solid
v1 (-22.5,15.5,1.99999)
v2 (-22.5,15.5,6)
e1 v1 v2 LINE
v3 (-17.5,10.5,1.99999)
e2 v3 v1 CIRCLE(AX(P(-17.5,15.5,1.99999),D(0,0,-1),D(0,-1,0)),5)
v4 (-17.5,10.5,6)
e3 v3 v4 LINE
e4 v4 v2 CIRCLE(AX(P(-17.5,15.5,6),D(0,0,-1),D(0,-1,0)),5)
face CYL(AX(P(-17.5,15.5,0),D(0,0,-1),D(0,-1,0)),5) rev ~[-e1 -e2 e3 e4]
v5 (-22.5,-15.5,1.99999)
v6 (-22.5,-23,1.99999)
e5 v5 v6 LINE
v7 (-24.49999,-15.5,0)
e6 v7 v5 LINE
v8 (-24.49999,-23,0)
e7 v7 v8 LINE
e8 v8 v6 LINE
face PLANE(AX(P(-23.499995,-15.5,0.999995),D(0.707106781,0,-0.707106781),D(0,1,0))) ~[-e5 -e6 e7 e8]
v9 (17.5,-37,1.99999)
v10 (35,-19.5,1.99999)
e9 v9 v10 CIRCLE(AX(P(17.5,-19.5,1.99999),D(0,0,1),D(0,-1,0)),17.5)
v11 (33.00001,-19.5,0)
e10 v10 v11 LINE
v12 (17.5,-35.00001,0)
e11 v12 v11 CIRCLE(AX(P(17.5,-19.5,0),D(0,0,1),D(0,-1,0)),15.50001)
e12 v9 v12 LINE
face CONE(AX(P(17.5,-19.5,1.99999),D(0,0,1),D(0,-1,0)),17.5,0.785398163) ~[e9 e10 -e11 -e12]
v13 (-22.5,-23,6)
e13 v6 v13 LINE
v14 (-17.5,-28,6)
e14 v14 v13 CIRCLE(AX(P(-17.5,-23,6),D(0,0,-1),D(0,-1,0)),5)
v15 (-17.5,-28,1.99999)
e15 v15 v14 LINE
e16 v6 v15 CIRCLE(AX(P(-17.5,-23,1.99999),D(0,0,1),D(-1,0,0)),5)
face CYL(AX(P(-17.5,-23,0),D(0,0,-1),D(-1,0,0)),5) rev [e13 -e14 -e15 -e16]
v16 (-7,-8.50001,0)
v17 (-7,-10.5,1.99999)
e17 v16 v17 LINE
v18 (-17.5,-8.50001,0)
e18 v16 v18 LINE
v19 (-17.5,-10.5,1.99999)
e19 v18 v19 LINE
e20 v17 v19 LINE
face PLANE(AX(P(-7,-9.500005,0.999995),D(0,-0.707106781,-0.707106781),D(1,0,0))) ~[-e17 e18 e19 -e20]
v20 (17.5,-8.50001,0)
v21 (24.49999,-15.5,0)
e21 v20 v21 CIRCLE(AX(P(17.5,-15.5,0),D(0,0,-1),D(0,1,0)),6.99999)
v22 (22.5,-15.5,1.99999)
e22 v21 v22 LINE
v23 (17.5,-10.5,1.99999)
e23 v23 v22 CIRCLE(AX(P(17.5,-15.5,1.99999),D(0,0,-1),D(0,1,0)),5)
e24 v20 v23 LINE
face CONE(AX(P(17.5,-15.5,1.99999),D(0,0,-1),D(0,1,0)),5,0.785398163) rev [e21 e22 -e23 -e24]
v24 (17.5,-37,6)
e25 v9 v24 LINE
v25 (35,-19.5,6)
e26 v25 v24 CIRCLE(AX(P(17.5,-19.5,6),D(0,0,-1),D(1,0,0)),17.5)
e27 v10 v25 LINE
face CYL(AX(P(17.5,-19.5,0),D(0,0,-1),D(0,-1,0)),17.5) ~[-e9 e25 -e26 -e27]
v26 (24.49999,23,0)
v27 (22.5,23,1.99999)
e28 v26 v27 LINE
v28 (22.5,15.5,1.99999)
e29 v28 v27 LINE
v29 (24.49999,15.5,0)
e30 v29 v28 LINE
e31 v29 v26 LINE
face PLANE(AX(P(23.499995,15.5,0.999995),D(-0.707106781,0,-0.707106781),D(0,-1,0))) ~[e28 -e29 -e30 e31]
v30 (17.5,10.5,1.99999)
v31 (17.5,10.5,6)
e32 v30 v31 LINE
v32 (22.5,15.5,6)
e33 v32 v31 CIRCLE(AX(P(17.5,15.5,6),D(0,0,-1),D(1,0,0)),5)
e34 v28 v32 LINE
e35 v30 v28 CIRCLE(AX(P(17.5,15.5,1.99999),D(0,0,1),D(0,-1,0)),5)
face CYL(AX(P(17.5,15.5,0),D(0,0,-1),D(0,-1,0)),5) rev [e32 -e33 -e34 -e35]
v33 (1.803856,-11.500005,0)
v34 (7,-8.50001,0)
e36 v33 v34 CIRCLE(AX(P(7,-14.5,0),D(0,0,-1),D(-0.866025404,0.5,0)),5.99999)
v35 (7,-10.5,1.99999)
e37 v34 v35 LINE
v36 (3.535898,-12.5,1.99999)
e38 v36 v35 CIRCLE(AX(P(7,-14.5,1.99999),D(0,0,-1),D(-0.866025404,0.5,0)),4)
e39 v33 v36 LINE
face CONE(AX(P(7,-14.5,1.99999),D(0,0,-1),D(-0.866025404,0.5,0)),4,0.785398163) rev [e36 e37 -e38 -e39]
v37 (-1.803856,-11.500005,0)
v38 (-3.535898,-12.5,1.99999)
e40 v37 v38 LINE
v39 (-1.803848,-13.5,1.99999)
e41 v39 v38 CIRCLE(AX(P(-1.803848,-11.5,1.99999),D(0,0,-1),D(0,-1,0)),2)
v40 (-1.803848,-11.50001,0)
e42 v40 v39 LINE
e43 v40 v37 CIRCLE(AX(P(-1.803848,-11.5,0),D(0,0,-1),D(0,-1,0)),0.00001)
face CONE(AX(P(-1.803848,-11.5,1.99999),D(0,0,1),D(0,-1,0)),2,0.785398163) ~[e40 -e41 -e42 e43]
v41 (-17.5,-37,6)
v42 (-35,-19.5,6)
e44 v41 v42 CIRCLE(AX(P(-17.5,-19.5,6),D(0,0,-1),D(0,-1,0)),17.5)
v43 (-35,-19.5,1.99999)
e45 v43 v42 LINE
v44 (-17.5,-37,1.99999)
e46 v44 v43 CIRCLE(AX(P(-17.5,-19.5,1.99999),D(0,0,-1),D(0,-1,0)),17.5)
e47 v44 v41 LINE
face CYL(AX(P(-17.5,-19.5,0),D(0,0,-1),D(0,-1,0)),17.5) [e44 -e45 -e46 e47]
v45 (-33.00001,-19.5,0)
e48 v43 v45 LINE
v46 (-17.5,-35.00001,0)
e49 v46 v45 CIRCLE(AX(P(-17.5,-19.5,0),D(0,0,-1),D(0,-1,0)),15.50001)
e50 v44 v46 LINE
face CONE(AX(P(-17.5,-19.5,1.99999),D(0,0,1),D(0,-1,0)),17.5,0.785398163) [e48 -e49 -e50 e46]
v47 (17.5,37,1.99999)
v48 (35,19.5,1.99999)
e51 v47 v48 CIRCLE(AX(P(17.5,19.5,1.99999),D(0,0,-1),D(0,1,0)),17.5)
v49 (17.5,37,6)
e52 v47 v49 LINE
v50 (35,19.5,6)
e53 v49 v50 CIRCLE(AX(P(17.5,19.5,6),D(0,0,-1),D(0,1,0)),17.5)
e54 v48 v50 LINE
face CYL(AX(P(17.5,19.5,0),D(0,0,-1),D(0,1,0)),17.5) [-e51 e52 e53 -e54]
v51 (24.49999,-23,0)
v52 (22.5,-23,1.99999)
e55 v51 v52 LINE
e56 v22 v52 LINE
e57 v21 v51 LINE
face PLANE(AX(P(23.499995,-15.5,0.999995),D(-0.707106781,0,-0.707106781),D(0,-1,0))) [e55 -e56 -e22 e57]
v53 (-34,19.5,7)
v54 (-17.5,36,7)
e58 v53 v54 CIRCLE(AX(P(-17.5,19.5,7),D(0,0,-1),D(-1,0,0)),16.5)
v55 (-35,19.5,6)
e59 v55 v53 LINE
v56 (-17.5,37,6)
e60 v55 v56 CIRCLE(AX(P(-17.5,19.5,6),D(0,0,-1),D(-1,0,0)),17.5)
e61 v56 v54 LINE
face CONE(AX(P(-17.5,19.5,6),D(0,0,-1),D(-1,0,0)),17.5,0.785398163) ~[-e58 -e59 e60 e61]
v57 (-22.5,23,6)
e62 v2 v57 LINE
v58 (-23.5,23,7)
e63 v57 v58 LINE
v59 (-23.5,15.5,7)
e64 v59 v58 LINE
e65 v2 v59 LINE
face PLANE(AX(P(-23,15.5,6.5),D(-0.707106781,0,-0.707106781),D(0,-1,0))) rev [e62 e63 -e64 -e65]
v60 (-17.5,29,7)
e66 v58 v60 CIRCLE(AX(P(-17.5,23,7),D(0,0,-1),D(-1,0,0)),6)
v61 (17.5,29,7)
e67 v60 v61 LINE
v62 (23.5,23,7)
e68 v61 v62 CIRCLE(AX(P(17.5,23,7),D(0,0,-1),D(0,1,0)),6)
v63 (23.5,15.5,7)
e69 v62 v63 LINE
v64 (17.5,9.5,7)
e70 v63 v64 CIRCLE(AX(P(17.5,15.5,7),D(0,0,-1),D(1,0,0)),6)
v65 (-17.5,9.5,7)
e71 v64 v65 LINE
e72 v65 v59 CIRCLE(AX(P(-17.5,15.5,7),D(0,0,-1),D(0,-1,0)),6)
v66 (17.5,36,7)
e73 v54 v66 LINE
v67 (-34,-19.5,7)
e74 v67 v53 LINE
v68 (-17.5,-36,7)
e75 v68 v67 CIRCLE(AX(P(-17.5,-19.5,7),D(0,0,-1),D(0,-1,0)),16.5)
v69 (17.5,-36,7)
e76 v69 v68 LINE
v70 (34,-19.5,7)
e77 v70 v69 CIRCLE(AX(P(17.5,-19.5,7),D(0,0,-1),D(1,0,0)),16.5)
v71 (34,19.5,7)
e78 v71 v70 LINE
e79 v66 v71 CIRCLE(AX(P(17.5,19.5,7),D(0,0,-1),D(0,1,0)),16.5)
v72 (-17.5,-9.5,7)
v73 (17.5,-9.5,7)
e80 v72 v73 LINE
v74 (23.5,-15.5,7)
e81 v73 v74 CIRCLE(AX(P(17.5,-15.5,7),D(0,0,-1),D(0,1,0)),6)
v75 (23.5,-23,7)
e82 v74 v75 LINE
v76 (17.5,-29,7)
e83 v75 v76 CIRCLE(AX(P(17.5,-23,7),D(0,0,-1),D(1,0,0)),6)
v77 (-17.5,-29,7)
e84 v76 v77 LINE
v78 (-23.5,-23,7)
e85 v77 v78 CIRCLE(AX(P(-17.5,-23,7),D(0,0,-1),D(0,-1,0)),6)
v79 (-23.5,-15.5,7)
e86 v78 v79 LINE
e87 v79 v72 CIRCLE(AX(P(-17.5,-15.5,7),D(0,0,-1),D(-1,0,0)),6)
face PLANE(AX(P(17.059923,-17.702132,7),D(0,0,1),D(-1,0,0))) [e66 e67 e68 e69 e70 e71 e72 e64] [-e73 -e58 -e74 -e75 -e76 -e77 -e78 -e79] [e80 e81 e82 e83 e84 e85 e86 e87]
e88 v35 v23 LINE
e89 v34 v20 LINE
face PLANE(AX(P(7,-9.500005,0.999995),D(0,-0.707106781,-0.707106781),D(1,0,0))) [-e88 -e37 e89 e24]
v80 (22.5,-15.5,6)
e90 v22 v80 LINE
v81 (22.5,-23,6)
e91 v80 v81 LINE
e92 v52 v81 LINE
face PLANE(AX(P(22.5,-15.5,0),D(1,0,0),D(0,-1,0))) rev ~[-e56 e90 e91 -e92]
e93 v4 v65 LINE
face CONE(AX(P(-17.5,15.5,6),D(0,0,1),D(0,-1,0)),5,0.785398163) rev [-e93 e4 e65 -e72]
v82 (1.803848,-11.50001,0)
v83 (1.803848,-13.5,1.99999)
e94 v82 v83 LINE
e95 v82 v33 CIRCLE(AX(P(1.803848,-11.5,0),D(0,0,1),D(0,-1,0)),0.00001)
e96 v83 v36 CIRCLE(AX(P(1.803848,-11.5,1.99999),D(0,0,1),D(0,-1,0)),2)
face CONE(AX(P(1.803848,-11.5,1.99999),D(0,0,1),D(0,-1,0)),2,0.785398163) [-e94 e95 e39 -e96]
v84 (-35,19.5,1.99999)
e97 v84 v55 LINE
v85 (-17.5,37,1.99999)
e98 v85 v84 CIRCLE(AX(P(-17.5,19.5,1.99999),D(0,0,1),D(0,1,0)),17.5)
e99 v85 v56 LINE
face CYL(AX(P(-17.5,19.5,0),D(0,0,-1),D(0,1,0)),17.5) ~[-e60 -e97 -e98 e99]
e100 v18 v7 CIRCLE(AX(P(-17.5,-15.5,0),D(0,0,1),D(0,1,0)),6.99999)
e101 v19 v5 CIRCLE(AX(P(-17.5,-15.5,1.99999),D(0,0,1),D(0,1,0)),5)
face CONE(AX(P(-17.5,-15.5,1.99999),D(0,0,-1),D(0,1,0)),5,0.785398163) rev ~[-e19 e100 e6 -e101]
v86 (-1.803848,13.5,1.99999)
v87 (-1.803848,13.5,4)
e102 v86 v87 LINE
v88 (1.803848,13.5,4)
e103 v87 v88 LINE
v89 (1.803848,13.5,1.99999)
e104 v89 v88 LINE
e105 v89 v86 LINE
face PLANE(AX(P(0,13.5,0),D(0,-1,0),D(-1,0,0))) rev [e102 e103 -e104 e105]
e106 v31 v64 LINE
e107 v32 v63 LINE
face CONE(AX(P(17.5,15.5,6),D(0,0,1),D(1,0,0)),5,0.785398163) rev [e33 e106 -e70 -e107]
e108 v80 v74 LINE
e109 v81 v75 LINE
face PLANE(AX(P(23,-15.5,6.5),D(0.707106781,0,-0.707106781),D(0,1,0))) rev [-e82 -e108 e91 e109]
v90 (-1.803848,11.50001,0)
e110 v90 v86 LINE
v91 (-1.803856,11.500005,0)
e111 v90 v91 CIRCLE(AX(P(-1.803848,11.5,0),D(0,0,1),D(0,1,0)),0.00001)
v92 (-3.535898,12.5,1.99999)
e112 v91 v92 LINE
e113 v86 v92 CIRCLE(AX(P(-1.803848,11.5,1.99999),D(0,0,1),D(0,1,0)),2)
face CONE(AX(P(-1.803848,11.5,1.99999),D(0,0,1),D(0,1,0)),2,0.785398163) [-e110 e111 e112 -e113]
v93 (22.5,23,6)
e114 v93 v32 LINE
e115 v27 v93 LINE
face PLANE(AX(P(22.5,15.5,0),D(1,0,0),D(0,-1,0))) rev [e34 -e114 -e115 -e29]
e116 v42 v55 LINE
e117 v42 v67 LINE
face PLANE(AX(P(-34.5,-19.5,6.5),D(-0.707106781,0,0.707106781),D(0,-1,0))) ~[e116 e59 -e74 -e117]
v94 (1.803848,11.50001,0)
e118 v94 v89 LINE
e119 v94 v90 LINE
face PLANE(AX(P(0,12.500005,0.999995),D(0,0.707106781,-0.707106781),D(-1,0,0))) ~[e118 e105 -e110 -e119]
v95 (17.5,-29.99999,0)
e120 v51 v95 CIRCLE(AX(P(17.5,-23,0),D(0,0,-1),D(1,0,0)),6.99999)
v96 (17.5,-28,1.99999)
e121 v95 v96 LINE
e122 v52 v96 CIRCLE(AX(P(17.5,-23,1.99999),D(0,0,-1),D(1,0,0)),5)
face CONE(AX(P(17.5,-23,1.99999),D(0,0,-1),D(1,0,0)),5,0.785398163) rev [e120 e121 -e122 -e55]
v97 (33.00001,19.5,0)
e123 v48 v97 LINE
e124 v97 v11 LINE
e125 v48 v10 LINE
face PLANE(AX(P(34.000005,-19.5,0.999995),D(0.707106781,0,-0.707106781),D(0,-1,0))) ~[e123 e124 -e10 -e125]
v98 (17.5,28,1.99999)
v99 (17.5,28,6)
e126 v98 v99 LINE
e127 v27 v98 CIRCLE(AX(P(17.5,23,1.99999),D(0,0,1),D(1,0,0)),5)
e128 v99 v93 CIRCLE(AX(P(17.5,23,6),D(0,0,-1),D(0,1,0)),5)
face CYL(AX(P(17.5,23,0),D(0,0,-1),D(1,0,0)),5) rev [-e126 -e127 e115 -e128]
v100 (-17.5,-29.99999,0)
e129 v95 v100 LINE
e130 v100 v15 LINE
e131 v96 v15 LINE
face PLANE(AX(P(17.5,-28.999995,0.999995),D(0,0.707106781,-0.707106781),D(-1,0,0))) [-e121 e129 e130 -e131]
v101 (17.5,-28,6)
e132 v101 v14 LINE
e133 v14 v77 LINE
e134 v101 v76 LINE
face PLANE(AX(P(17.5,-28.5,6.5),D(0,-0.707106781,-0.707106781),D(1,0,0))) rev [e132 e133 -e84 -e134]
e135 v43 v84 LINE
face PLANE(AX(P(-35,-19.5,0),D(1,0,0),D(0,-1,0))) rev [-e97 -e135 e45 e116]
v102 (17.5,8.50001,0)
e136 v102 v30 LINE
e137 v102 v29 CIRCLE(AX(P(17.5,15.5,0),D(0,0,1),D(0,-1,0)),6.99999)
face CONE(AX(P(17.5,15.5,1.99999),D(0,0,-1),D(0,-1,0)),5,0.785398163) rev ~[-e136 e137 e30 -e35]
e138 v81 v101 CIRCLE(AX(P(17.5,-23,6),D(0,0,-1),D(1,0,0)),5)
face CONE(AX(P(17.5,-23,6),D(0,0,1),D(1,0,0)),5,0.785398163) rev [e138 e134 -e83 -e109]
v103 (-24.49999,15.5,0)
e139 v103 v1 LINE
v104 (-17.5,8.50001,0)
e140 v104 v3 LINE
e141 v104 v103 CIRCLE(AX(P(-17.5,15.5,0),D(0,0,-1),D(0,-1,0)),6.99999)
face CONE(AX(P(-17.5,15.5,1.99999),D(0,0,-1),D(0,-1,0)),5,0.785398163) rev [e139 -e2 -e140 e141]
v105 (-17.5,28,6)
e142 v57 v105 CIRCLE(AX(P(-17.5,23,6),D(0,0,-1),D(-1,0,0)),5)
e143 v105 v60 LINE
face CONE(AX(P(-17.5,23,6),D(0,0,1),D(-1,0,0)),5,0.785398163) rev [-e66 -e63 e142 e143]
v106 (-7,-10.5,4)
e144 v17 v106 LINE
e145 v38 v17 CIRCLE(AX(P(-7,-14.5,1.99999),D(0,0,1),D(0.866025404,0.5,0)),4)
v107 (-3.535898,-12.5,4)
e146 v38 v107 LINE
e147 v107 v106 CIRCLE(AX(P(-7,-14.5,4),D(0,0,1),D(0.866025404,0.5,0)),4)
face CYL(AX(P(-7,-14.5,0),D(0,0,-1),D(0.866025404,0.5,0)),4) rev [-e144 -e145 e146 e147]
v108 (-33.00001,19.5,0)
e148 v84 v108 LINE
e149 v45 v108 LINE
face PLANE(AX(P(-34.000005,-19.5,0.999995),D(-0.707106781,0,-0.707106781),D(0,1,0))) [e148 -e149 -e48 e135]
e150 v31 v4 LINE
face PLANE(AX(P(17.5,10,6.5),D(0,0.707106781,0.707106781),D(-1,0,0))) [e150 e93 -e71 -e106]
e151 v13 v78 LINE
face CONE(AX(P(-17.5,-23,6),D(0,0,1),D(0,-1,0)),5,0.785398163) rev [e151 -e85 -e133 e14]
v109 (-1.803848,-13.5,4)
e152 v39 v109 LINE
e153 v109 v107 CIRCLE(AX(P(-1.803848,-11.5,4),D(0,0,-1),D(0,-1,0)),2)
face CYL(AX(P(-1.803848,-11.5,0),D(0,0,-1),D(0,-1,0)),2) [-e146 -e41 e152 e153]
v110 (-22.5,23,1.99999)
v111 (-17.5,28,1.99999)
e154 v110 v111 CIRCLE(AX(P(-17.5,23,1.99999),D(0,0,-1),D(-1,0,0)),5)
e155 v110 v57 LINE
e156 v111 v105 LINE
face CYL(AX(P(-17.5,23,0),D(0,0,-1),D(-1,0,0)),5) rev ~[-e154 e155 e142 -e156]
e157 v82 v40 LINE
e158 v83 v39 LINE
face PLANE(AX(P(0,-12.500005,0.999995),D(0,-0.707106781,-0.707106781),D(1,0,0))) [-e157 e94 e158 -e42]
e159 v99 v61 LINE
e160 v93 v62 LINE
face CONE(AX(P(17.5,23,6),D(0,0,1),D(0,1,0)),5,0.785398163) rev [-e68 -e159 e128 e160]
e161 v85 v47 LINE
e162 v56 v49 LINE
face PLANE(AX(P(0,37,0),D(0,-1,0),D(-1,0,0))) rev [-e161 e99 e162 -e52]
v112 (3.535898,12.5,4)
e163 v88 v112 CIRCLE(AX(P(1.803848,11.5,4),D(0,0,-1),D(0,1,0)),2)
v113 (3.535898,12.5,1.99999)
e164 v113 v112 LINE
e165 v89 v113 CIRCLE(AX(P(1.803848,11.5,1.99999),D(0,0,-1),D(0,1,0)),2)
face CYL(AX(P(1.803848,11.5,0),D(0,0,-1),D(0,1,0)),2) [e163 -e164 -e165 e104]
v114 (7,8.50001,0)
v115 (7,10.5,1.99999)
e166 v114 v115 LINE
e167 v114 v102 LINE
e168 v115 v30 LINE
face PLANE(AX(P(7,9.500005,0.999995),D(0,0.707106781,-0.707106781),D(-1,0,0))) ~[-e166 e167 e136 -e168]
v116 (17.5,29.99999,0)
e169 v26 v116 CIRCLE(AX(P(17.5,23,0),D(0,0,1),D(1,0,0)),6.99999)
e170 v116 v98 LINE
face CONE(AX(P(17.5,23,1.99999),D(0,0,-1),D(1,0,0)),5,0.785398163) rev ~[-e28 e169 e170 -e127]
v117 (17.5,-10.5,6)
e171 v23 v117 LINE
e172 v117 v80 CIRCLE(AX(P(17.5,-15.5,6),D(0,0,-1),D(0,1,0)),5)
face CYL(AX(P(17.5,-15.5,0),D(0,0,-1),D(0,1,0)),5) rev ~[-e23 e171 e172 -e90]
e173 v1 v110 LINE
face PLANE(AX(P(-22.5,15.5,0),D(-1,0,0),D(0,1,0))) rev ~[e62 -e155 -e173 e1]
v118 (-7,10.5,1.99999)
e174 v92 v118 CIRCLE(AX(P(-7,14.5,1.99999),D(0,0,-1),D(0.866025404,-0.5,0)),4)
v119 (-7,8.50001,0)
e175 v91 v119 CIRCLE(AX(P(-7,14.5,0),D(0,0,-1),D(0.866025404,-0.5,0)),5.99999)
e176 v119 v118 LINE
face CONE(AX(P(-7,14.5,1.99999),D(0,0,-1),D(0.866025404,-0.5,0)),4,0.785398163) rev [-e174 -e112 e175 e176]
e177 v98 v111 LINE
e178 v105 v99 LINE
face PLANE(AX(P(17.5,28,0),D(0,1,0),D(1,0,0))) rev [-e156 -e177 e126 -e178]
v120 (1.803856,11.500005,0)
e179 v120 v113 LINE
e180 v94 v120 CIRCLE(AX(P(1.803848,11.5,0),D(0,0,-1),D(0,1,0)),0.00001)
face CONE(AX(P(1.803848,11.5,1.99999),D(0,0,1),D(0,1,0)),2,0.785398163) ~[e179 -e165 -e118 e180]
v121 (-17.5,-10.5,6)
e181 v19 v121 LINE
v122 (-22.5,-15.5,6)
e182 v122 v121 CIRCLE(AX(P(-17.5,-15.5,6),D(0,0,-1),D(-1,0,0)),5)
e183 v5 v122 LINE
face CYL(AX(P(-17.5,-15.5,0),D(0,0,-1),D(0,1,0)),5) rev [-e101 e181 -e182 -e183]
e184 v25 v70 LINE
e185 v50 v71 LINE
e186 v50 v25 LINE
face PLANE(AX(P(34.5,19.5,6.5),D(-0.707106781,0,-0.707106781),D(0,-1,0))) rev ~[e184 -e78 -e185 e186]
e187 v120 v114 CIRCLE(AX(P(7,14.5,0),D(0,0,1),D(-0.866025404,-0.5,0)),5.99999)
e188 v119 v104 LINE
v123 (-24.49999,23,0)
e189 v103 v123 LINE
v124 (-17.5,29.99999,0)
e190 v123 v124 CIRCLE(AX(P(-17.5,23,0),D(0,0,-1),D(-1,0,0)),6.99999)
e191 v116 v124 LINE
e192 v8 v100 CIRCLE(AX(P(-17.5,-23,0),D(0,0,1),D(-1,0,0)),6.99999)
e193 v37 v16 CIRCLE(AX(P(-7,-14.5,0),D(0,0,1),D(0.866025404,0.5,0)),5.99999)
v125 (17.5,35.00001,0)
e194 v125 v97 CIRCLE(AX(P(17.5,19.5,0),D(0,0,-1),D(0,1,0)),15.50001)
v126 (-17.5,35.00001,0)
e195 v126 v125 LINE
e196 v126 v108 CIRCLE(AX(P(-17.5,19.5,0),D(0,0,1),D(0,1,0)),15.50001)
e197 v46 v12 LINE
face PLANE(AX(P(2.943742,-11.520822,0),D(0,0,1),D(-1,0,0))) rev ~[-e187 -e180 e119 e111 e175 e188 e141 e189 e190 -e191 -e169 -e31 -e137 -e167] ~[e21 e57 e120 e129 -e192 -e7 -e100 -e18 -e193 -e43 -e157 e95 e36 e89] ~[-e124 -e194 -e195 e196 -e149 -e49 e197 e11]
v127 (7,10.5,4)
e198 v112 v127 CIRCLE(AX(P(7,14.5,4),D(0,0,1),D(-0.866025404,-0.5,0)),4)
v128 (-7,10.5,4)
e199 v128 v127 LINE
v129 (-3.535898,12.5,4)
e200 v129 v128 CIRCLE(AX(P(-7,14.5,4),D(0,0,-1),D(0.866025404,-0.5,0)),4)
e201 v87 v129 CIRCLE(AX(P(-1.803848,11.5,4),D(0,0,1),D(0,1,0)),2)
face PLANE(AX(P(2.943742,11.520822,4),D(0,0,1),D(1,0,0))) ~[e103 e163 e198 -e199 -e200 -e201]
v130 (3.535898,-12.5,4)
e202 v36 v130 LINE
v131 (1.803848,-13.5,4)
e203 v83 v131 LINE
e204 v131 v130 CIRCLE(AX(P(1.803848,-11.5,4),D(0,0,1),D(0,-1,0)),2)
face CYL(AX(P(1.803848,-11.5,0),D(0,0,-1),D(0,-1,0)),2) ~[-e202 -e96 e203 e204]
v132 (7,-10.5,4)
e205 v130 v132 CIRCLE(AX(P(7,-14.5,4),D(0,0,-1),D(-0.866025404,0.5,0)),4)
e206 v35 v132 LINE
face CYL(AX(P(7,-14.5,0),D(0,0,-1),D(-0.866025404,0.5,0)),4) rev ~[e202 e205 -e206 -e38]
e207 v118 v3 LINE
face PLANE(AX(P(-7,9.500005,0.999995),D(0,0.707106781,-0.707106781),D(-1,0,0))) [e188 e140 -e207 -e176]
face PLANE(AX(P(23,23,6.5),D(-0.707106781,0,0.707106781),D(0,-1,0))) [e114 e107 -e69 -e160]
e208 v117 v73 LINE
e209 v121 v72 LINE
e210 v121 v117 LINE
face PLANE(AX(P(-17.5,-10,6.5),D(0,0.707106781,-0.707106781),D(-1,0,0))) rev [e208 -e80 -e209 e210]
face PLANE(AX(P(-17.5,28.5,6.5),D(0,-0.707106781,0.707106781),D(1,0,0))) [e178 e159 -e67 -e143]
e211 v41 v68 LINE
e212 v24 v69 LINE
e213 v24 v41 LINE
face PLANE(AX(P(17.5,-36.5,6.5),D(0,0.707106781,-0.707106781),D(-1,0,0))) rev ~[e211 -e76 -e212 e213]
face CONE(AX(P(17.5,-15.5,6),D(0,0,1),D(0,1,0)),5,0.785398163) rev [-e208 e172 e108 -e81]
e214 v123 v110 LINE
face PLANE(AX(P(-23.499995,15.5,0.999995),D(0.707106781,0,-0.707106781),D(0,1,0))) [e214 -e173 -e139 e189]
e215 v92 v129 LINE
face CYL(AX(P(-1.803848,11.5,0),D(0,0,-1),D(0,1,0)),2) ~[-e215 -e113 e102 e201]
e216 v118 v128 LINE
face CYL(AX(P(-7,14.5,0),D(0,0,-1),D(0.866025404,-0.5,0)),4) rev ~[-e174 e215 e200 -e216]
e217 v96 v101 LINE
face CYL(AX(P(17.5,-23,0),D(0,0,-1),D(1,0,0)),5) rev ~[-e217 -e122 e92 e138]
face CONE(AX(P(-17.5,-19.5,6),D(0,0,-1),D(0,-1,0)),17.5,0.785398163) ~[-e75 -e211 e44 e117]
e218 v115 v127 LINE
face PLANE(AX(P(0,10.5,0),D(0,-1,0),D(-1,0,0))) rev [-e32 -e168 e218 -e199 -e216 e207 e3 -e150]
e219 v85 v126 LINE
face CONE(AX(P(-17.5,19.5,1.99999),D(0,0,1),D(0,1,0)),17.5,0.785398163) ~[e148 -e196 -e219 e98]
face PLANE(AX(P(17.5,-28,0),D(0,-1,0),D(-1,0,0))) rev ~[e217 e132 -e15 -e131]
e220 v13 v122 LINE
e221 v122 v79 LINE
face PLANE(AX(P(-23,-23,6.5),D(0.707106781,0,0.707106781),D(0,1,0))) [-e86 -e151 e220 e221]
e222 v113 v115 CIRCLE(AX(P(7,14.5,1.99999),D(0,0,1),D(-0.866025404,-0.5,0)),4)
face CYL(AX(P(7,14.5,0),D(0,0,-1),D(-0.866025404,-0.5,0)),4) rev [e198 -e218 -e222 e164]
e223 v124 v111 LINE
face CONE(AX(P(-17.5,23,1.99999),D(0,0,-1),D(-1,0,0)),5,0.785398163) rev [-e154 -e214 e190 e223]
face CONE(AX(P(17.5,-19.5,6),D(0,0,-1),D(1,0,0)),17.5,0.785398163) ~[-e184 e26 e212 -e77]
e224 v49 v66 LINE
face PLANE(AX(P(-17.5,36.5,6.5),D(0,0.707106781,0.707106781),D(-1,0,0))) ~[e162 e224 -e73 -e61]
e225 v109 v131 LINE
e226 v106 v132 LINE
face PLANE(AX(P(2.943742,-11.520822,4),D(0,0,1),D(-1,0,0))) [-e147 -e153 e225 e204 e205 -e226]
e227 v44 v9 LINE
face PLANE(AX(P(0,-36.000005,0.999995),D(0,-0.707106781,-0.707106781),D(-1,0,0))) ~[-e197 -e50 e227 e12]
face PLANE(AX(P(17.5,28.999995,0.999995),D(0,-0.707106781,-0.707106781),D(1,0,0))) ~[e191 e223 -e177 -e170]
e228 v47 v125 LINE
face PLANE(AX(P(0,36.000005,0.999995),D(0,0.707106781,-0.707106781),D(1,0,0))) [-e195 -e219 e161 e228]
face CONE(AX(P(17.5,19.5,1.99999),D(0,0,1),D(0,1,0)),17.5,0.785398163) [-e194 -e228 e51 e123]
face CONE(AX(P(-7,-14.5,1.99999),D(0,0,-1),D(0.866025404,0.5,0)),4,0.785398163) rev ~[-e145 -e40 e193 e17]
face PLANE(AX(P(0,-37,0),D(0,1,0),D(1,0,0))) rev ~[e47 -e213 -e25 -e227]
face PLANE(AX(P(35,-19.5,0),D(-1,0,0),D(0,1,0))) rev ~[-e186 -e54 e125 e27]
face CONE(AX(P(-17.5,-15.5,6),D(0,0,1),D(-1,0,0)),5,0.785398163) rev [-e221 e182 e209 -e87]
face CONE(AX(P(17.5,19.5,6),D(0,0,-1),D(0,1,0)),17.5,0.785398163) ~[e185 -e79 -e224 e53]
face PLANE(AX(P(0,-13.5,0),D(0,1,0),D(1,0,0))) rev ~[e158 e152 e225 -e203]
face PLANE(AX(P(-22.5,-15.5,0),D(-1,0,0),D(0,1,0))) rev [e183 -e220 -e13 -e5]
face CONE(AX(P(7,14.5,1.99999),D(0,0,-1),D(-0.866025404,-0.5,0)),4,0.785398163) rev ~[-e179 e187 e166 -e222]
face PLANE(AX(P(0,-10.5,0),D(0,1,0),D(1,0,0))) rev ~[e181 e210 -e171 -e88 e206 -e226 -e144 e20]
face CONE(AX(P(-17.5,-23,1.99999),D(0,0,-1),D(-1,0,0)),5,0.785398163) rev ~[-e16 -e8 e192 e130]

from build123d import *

# Parameters (mm, degrees)
F1_DEPTH = 7
F3_DEPTH = 4
F4_SIZE  = 1.99999
F8_SIZE  = 1


# Not quite as in the source:
# - a fillet or chamfer is up to 0.001 mm smaller than in the source, because OpenCascade refuses the exact size


with BuildPart() as f1:
    # F0 (on Top) → F1 (new body)
    with BuildSketch(Plane.XY):
        with BuildLine():
            Line((0, 10.5), (-17.5, 10.5))
            ThreePointArc((-17.5, 10.5), (-21.0355339059, 11.9644660941), (-22.5, 15.5))
            Line((-22.5, 15.5), (-22.5, 23))
            ThreePointArc((-22.5, 23), (-21.0355339059, 26.5355339059), (-17.5, 28))
            Line((-17.5, 28), (0, 28))
            Line((0, 28), (0, 37))
            Line((0, 37), (-17.5, 37))
            ThreePointArc((-17.5, 37), (-29.8743686708, 31.8743686708), (-35, 19.5))
            Line((-35, 19.5), (-35, 0))
            Line((-35, 0), (0, 0))
            Line((0, 0), (0, 10.5))
        make_face()
    extrude(amount=F1_DEPTH)

    # F2 (on Top) → F3 (join)
    with BuildSketch(Plane.XY):
        with BuildLine():
            Line((-7, 10.5), (0, 10.5))
            Line((0, 10.5), (0, 13.5))
            Line((0, 13.5), (-1.8038475773, 13.5))
            ThreePointArc((-1.8038475773, 13.5), (-2.8038475773, 13.2320508076), (-3.5358983849, 12.5))
            ThreePointArc((-3.5358983849, 12.5), (-5, 11.0358983849), (-7, 10.5))
        make_face()
    extrude(amount=F3_DEPTH)

    # F4 (size 2 in the source; OpenCascade refuses exactly that, so slightly less here)
    f4_edges = [f1.edges().sort_by_distance(p)[0] for p in [
        (-0.901924, 13.5, 0),
        (-35, 9.75, 0),
    ]]
    chamfer(f4_edges, length=F4_SIZE)

    # F6: F1 across face


with BuildPart() as f1_1:
    add(f1.part)
    add(f1.part.mirror(Plane(origin=(0, 6.0384247014, 3.3522948458), x_dir=(0, 1, 0), z_dir=(1, 0, 0))))

    # F7: F1 across face


with BuildPart() as f1_2:
    add(f1_1.part)
    add(f1_1.part.mirror(Plane(origin=(0, 0, 3.5233194082), x_dir=(1, 0, 0), z_dir=(0, -1, 0))))

    # F8
    f8_edges = [f1_2.edges().sort_by_distance(p)[0] for p in [
        (29.874369, 31.874369, 7),
        (0, 37, 7),
        (-29.874369, 31.874369, 7),
        (-35, 0, 7),
        (-29.874369, -31.874369, 7),
        (0, -37, 7),
        (29.874369, -31.874369, 7),
        (35, 0, 7),
        (-21.035534, 11.964466, 7),
        (-22.5, 19.25, 7),
        (-21.035534, 26.535534, 7),
        (0, 28, 7),
        (21.035534, 26.535534, 7),
        (22.5, 19.25, 7),
        (21.035534, 11.964466, 7),
        (0, 10.5, 7),
        (0, -10.5, 7),
        (21.035534, -11.964466, 7),
        (22.5, -19.25, 7),
        (21.035534, -26.535534, 7),
        (0, -28, 7),
        (-21.035534, -26.535534, 7),
        (-22.5, -19.25, 7),
        (-21.035534, -11.964466, 7),
    ]]
    chamfer(f8_edges, length=F8_SIZE)


solid = f1_2.part
